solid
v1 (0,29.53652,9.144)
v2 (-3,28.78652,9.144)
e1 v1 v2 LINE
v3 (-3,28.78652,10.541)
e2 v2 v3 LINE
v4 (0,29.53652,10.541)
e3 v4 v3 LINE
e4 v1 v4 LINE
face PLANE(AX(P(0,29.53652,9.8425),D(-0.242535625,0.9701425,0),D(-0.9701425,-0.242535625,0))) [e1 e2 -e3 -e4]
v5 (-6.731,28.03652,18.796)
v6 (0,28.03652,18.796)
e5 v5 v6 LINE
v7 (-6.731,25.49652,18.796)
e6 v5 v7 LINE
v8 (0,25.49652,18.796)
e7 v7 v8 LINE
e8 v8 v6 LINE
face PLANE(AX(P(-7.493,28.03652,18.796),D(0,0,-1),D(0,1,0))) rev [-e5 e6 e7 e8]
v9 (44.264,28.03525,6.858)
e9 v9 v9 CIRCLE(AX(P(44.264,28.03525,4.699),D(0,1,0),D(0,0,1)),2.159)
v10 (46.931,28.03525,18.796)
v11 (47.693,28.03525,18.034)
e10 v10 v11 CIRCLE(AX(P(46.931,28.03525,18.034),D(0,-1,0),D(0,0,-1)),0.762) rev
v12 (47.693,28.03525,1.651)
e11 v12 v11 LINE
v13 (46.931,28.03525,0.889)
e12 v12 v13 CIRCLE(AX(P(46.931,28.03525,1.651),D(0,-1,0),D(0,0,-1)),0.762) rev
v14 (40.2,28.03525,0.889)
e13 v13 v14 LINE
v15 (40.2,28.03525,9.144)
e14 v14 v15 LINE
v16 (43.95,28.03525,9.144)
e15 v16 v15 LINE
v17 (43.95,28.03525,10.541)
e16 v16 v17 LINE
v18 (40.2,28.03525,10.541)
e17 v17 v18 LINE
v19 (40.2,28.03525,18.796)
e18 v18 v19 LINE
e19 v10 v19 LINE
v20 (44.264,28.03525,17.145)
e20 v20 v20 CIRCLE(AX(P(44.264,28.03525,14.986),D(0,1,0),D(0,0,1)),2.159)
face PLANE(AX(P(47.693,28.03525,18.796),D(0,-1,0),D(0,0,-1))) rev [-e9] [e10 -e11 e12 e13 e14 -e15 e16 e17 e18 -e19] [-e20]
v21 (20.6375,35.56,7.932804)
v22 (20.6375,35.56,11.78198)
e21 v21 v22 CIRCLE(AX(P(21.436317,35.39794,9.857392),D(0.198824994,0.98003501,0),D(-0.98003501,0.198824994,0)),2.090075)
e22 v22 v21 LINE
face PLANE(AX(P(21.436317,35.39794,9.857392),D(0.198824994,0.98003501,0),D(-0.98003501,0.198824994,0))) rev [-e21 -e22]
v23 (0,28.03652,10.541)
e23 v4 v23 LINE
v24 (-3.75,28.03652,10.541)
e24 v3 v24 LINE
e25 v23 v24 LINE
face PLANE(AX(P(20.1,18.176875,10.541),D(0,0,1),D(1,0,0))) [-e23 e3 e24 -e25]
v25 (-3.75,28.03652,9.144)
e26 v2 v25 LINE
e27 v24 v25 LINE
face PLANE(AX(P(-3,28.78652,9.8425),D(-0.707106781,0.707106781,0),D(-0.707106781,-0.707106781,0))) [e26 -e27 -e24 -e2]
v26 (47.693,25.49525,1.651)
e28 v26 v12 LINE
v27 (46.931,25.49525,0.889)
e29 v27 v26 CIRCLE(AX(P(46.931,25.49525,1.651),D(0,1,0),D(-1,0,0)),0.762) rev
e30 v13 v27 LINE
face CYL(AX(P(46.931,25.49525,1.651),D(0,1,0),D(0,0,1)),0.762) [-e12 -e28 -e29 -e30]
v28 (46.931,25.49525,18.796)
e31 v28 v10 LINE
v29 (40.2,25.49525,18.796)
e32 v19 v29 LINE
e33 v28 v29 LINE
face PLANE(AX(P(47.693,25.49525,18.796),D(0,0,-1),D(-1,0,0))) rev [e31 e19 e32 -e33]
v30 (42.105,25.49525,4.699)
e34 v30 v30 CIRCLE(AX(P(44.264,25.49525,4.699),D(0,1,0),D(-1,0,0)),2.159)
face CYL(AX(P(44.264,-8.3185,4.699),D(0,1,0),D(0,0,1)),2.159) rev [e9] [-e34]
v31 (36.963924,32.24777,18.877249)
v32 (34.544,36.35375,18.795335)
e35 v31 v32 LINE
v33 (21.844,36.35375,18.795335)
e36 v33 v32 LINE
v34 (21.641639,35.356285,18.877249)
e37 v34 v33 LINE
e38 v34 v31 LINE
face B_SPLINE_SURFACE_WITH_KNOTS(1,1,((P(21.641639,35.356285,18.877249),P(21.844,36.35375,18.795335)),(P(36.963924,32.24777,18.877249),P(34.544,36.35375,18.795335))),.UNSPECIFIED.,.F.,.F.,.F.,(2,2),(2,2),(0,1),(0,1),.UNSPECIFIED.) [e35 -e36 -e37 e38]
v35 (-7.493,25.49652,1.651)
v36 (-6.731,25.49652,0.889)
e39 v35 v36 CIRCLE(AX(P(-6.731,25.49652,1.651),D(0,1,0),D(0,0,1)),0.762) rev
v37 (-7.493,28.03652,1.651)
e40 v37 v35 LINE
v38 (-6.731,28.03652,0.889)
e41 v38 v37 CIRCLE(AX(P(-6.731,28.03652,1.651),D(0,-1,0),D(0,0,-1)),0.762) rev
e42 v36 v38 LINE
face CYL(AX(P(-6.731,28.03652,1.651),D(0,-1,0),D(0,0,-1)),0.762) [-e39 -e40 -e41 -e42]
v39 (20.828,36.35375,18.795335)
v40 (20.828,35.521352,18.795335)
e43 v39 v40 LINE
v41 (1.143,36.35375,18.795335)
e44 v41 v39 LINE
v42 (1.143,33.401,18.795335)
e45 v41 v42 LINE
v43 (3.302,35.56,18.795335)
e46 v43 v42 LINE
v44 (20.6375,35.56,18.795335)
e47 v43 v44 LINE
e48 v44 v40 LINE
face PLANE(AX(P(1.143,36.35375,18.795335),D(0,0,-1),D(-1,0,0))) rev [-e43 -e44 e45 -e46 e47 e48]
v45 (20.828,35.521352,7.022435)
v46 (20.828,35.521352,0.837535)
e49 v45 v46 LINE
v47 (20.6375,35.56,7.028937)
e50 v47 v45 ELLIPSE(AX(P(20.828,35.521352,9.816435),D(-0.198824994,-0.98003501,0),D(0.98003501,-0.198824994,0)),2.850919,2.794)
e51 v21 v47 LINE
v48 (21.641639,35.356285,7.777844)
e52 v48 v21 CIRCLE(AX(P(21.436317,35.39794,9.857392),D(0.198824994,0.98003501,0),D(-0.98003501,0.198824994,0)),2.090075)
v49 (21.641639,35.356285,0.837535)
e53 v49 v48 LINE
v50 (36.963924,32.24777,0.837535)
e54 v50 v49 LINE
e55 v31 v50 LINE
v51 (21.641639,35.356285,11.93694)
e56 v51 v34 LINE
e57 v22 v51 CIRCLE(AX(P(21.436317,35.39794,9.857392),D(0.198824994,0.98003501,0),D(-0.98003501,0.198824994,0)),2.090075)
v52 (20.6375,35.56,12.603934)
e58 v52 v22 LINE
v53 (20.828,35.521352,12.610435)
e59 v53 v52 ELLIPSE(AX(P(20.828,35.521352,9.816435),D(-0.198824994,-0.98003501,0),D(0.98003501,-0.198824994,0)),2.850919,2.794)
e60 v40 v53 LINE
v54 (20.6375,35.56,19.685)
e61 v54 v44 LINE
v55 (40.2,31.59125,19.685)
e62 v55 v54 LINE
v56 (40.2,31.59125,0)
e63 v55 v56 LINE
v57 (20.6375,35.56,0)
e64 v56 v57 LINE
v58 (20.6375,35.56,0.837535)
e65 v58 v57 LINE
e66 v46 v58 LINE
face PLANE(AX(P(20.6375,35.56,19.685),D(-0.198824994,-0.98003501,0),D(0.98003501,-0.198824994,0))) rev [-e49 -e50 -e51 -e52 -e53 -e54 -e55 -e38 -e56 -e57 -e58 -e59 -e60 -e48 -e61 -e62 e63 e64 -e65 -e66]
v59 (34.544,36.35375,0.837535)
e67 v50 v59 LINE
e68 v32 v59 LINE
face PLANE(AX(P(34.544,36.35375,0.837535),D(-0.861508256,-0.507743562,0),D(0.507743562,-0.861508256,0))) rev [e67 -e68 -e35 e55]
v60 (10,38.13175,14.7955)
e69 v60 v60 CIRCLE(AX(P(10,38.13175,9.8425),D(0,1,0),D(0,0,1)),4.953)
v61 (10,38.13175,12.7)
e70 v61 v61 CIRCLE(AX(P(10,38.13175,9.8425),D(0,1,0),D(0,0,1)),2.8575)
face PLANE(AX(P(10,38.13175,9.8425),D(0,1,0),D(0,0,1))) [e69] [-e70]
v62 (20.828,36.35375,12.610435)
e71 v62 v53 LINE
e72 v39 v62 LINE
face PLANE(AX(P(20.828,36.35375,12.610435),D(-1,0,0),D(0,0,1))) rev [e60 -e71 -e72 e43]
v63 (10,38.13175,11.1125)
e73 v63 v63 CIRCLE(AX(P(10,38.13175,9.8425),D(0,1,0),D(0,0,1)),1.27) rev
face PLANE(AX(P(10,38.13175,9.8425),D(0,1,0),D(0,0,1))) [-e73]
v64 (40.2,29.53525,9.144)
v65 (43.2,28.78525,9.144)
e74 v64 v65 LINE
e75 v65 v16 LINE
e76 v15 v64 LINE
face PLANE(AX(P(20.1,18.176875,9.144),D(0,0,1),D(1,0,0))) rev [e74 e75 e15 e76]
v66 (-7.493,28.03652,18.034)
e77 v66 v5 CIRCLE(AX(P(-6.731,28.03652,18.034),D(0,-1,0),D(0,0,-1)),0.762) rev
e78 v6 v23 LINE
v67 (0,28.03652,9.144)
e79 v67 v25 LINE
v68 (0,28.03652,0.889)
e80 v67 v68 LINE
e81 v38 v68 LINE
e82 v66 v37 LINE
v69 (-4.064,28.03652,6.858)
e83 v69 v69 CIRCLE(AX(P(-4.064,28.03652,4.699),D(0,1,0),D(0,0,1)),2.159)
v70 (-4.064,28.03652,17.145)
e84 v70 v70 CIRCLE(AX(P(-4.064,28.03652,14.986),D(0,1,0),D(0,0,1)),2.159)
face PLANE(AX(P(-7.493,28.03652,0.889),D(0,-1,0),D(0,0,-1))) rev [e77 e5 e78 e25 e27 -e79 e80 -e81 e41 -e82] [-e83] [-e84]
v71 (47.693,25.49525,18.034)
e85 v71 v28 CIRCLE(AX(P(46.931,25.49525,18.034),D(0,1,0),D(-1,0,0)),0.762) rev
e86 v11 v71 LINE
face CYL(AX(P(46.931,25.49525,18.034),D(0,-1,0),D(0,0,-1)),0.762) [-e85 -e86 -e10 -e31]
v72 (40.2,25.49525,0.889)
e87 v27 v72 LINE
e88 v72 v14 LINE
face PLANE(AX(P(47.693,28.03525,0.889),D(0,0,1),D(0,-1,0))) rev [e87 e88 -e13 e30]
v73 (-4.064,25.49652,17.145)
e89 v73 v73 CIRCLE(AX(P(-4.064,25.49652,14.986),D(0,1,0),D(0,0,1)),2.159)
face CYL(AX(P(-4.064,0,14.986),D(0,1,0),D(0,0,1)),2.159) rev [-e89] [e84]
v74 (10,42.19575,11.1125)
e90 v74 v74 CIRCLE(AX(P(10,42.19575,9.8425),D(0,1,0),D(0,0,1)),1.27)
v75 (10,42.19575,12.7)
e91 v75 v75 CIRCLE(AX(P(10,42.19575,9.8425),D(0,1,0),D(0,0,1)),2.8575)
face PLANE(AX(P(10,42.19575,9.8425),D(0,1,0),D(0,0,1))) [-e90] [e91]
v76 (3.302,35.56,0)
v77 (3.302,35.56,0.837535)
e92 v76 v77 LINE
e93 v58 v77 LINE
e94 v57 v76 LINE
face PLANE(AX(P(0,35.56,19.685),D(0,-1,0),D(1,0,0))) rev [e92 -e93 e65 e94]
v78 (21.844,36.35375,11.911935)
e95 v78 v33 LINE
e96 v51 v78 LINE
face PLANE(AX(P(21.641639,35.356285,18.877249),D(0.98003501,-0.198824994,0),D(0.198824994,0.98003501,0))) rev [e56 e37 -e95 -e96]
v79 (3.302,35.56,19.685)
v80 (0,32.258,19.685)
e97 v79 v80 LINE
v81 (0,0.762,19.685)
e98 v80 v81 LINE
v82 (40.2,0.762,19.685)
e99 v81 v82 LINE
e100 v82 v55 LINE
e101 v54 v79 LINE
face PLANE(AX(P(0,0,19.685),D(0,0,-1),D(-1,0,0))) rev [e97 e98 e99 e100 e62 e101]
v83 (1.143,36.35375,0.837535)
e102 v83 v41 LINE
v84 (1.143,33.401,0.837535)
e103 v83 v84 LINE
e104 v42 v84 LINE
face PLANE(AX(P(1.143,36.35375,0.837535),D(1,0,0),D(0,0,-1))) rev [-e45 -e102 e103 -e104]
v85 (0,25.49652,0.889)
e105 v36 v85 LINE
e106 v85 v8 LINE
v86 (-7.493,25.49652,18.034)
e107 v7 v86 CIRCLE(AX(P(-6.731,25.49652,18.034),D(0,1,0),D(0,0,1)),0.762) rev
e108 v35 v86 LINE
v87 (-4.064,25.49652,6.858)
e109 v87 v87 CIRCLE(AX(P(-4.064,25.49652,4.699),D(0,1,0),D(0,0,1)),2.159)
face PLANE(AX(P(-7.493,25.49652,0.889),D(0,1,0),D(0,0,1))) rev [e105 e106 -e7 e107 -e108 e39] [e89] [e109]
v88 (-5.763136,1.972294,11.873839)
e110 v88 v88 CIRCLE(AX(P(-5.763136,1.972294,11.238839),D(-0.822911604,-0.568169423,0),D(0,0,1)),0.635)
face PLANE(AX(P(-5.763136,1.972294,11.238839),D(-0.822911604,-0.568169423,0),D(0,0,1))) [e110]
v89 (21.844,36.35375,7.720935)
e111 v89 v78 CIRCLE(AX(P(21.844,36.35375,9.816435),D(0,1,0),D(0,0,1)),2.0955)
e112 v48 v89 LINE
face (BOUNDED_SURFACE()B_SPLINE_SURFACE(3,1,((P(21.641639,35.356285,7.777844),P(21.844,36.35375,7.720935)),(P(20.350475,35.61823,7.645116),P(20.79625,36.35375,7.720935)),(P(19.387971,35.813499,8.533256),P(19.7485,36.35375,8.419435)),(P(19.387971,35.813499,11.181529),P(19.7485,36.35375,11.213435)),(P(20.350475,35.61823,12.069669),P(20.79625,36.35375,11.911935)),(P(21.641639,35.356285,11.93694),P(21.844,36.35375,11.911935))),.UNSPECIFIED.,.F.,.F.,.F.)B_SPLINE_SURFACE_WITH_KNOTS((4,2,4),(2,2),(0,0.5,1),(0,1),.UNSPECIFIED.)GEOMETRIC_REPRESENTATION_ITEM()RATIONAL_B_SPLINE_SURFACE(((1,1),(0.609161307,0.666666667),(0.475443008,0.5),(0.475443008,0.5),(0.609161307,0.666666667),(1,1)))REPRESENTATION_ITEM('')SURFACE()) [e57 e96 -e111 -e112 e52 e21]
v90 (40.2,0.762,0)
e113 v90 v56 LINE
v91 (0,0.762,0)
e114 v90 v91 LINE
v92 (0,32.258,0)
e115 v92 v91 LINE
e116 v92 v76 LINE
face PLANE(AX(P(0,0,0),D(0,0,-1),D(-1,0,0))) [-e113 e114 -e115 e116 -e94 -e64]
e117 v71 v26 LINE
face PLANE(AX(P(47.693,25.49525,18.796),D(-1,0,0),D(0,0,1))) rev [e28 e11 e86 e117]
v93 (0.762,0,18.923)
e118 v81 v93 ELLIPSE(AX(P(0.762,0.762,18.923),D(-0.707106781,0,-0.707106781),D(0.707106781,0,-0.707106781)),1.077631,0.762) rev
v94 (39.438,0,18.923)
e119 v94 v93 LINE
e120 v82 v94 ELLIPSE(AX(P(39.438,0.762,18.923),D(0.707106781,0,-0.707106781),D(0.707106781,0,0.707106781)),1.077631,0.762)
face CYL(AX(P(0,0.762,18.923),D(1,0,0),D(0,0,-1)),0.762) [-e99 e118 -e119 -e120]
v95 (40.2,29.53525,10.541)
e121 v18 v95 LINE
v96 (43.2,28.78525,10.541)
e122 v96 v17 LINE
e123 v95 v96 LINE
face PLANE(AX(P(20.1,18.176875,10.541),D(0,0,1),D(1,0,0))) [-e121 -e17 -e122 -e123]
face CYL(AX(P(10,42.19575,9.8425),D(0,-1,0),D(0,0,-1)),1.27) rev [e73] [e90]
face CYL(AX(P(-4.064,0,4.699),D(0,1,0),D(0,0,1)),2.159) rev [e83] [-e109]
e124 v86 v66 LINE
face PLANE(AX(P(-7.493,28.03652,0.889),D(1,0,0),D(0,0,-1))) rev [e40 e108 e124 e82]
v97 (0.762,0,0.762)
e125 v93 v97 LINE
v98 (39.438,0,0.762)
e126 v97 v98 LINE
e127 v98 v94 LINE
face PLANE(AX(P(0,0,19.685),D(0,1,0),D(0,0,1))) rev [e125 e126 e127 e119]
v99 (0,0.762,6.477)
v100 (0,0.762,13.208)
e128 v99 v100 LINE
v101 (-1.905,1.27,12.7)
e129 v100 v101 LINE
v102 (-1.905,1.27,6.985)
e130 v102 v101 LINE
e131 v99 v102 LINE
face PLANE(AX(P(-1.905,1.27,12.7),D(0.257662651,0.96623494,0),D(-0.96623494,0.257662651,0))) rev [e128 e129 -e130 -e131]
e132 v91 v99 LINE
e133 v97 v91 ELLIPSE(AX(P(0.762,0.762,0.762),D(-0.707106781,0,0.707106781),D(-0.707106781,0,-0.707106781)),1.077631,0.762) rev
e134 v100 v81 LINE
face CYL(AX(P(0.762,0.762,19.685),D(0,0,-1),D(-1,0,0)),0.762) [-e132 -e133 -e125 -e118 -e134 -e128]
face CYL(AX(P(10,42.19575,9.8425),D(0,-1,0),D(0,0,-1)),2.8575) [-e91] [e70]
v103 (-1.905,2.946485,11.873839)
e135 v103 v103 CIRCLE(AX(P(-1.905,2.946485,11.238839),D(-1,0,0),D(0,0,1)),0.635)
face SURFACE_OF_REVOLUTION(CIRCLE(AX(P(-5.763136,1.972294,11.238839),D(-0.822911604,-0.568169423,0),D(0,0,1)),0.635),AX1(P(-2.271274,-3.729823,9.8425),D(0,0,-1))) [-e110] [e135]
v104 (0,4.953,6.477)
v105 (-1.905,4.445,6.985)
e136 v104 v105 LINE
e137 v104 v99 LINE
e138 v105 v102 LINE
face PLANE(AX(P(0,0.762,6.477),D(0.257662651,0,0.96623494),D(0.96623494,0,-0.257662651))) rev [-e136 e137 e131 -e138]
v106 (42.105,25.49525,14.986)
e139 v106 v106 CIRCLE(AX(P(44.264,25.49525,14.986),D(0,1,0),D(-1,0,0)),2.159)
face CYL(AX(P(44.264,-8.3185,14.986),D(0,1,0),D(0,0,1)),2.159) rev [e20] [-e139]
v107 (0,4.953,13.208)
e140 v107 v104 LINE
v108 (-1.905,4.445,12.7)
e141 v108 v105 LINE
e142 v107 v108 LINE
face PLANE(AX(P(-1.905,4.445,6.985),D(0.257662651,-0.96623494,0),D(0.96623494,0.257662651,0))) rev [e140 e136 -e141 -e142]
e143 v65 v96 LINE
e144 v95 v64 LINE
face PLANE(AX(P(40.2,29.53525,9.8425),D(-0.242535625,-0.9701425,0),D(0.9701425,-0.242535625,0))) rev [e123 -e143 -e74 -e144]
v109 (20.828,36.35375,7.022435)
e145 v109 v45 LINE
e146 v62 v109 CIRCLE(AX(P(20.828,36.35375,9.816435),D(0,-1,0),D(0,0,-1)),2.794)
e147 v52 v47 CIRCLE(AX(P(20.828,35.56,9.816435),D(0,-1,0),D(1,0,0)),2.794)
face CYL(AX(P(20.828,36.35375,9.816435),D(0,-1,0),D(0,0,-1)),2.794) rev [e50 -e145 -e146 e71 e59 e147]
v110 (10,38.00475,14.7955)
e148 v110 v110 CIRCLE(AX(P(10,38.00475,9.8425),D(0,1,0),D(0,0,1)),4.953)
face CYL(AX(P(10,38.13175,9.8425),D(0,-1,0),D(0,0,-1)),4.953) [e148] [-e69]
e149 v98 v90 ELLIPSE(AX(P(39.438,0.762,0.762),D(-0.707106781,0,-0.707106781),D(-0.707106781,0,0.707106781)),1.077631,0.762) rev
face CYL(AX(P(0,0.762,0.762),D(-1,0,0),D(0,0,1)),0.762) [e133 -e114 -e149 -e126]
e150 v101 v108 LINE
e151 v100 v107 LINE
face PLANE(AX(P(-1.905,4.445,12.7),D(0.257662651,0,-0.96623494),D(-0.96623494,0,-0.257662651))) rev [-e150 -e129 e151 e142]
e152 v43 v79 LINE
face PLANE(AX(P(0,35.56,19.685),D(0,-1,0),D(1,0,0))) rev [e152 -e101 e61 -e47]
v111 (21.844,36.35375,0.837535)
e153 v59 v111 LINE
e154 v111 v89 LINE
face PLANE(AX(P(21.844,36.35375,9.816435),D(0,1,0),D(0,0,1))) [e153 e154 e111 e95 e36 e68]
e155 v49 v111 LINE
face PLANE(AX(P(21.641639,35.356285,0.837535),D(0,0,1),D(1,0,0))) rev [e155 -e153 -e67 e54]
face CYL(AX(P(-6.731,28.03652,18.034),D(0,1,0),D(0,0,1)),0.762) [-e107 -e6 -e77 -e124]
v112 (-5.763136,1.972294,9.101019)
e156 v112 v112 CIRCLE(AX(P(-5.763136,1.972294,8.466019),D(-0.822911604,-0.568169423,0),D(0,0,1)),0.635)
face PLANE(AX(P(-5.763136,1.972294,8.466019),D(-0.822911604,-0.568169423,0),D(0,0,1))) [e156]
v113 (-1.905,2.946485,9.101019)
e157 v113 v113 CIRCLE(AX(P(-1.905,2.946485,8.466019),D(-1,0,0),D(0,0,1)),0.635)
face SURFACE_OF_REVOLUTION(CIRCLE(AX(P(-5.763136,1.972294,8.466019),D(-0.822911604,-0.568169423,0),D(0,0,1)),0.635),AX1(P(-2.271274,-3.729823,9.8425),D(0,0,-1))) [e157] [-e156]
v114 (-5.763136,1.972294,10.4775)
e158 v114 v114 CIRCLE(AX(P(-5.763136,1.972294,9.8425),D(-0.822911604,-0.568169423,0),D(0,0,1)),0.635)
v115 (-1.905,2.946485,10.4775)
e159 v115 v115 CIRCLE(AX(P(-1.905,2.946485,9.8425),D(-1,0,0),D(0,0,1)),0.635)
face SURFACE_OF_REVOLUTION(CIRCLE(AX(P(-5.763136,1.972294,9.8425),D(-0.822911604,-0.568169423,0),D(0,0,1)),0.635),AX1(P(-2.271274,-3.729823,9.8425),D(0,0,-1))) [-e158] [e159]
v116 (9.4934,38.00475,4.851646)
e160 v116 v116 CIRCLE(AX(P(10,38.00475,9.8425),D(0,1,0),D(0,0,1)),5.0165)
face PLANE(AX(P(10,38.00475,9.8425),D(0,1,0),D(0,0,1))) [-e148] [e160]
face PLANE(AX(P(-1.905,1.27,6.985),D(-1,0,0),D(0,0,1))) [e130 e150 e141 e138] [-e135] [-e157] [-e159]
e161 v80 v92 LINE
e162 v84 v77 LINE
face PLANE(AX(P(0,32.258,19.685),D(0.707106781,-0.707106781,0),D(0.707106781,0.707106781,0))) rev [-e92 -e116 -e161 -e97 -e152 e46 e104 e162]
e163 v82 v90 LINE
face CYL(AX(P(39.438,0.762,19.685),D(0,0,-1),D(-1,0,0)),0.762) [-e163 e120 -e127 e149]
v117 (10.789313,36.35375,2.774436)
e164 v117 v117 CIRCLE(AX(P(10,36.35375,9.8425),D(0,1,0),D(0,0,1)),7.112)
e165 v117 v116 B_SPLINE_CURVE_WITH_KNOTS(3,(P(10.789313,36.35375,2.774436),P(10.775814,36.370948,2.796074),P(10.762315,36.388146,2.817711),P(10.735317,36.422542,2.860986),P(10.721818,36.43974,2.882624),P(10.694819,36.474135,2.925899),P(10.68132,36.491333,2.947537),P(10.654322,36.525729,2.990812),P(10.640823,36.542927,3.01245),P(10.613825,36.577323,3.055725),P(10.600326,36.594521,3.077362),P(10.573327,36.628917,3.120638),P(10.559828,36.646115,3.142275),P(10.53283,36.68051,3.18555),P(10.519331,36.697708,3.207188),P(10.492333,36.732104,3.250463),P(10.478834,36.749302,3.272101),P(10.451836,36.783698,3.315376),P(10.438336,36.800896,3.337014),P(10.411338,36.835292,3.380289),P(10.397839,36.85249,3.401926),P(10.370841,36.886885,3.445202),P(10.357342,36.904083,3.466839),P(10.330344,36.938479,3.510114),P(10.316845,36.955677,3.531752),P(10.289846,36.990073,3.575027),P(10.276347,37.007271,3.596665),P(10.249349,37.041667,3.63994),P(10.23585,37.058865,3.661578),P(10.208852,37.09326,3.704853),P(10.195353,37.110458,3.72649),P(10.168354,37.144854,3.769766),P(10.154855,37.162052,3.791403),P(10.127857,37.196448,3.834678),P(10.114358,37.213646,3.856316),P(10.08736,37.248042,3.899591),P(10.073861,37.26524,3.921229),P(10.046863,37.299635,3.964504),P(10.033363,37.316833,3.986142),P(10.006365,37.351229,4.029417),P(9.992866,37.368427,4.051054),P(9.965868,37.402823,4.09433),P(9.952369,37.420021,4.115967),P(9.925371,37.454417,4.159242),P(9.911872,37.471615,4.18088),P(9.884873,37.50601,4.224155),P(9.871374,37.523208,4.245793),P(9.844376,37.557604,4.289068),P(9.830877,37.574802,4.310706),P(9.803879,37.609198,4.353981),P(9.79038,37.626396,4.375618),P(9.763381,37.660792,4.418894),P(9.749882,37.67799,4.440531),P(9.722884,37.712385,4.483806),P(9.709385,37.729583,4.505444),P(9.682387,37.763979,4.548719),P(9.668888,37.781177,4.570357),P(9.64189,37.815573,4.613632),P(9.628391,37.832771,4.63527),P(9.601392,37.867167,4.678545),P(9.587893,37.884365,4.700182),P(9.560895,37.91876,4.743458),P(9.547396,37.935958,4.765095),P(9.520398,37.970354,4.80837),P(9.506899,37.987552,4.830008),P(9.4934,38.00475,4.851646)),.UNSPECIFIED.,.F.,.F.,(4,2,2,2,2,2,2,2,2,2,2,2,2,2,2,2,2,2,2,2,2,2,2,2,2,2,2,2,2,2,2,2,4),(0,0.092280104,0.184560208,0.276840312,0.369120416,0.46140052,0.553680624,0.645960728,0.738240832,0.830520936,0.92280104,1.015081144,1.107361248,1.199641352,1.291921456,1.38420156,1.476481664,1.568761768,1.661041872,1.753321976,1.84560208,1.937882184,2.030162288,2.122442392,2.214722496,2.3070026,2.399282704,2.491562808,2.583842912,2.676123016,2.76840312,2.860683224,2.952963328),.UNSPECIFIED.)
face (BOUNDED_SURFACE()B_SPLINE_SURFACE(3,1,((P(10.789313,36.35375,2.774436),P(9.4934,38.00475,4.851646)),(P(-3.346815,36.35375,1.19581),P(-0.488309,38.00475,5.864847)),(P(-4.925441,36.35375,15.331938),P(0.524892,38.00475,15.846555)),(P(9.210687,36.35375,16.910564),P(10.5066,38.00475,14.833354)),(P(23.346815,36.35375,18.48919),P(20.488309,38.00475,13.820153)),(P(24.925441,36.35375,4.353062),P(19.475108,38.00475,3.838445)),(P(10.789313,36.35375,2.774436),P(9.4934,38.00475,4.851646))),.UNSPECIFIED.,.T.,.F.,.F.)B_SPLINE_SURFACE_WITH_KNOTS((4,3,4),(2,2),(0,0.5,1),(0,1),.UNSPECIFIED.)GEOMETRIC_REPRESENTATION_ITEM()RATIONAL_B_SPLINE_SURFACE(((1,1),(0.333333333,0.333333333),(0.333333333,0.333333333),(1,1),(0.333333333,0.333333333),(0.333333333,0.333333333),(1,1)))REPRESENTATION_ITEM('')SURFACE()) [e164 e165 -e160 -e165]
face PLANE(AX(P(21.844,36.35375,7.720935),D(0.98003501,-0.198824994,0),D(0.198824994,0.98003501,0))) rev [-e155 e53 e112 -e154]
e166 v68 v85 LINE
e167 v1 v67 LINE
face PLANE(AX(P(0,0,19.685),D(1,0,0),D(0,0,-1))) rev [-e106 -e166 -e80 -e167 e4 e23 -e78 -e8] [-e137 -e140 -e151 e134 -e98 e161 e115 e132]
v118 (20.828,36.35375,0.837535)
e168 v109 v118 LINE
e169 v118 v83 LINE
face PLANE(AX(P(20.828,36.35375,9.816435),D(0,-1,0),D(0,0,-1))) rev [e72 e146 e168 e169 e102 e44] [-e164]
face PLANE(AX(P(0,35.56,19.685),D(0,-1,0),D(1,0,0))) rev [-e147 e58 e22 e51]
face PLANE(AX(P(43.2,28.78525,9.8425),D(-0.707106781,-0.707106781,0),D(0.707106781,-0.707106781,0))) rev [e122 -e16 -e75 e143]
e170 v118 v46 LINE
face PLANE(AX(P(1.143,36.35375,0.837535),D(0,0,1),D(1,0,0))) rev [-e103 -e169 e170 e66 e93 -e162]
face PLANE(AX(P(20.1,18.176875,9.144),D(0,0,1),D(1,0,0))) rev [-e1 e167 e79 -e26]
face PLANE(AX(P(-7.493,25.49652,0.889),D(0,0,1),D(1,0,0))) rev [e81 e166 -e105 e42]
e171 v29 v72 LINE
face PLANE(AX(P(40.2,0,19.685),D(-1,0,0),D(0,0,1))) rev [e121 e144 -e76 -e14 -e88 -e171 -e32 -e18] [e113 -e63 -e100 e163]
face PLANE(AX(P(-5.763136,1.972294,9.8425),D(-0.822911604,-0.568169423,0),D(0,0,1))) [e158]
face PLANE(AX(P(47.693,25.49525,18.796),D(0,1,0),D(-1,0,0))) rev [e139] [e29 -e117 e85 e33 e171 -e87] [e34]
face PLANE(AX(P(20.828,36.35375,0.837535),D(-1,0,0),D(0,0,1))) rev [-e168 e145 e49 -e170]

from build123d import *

# Parameters (mm, degrees)
EXTRUDE1_DEPTH     = 19.685
CHAMFER1_SIZE      = 3.302
FILLET1_R          = 0.762
SKETCH2_W          = 17.907
SKETCH2_H          = 2.54
EXTRUDE2_DEPTH     = 7.493
SKETCH4_W          = 17.907
SKETCH4_H          = 2.54
EXTRUDE3_DEPTH     = 7.493
FILLET2_R          = 0.762
EXTRUDE4_DEPTH     = 36.35375
SKETCH10_R         = 2.159
CUT_EXTRUDE1_DEPTH = 36.35375
SKETCH19_R         = 2.159
CUT_EXTRUDE2_DEPTH = 59.72110295
RIB2_START         = -0.6985
RIB2_DEPTH         = 1.397
RIB3_START         = -0.6985
RIB3_DEPTH         = 1.397
SKETCH16_R         = 5.0165
EXTRUDE5_DEPTH     = 1.651
SKETCH18_R         = 4.953
EXTRUDE6_DEPTH     = 0.127
SKETCH20_R         = 2.8575
SKETCH20_R_2       = 1.27
EXTRUDE7_DEPTH     = 4.064
SKETCH22_W         = 5.715
SKETCH22_H         = 3.175
EXTRUDE8_DEPTH     = 1.905
SKETCH24_R         = 0.635


with BuildPart() as part:
    # Sketch1 → Extrude1 (new body)
    with BuildSketch(Plane.XY):
        Polygon((0, 0), (40.2, 0), (40.2, 31.59125), (20.6375, 35.56), (0, 35.56), align=None)
    extrude(amount=EXTRUDE1_DEPTH)

    # Chamfer1
    chamfer1_edges = [part.edges().sort_by_distance(p)[0] for p in [
        (0, 35.56, 9.8425),
    ]]
    chamfer(chamfer1_edges, length=CHAMFER1_SIZE)

    # Fillet1
    fillet1_edges = [part.edges().sort_by_distance(p)[0] for p in [
        (20.1, 0, 0),
        (20.1, 0, 19.685),
        (40.2, 0, 9.8425),
        (0, 0, 9.8425),
    ]]
    fillet(fillet1_edges, radius=FILLET1_R)

    # Sketch2 → Extrude2 (add)
    with BuildSketch(Plane(origin=(40.2, 0, 0), x_dir=(0, 0, -1), z_dir=(1, 0, 0))):
        with Locations((-9.8425, 26.76525)):
            Rectangle(SKETCH2_W, SKETCH2_H)
    extrude(amount=EXTRUDE2_DEPTH)

    # Sketch4 → Extrude3 (add)
    with BuildSketch(Plane.ZY):
        with Locations((9.8425, 26.76652)):
            Rectangle(SKETCH4_W, SKETCH4_H)
    extrude(amount=EXTRUDE3_DEPTH)

    # Fillet2
    fillet2_edges = [part.edges().sort_by_distance(p)[0] for p in [
        (47.693, 26.76525, 18.796),
        (47.693, 26.76525, 0.889),
        (-7.493, 26.76652, 0.889),
        (-7.493, 26.76652, 18.796),
    ]]
    fillet(fillet2_edges, radius=FILLET2_R)

    # Sketch5 → Extrude4 (add)
    with BuildSketch(Plane(origin=(0, 0, 0), x_dir=(1, 0, 0), z_dir=(0, 1, 0))):
        with BuildLine():
            Line((1.143, -0.837535442), (20.828, -0.837535442))
            Line((20.828, -0.837535442), (20.828, -7.022435442))
            ThreePointArc((20.828, -7.022435442), (18.034, -9.816435442), (20.828, -12.610435442))
            Line((20.828, -12.610435442), (20.828, -18.795335442))
            Line((20.828, -18.795335442), (1.143, -18.795335442))
            Line((1.143, -18.795335442), (1.143, -0.837535442))
        make_face()
    extrude(amount=EXTRUDE4_DEPTH)

    # Loft1: read off the stored shape, not the designer's step
    # Loft1: loft between two sections, ruled curve by curve
    loft1_from = [
        Edge.make_bspline([(21.641638875, 35.356284925, 7.777844123), (20.350474841, 35.618230344, 7.645115734), (19.387970871, 35.813498721, 8.533256016), (19.387970871, 35.813498721, 11.181528503), (20.350474841, 35.618230344, 12.069668784), (21.641638875, 35.356284925, 11.936940395)], [0, 0, 0, 0, 0.5, 0.5, 1, 1, 1, 1], 3, [1, 0.609161307, 0.475443008, 0.475443008, 0.609161307, 1]),
        Edge.make_bspline([(21.641638875, 35.356284925, 18.877249077), (36.963924395, 32.247770131, 18.877249077)], [0, 0, 1, 1], 1),
        Edge.make_line((21.641638875, 35.356284925, 0.837535442), (36.963924395, 32.247770131, 0.837535442)),
        Edge.make_line((36.963924395, 32.247770131, 0.837535442), (36.963924395, 32.247770131, 18.877249077)),
        Edge.make_line((21.641638875, 35.356284925, 7.777844123), (21.641638875, 35.356284925, 0.837535442)),
        Edge.make_line((21.641638875, 35.356284925, 18.877249077), (21.641638875, 35.356284925, 11.936940395)),
    ]
    loft1_to = [
        Edge.make_bspline([(21.844, 36.35375, 7.720935442), (20.79625, 36.35375, 7.720935442), (19.7485, 36.35375, 8.419435442), (19.7485, 36.35375, 11.213435442), (20.79625, 36.35375, 11.911935442), (21.844, 36.35375, 11.911935442)], [0, 0, 0, 0, 0.5, 0.5, 1, 1, 1, 1], 3, [1, 0.666666667, 0.5, 0.5, 0.666666667, 1]),
        Edge.make_bspline([(21.844, 36.35375, 18.795335442), (34.544, 36.35375, 18.795335442)], [0, 0, 1, 1], 1),
        Edge.make_line((21.844, 36.35375, 0.837535442), (34.544, 36.35375, 0.837535442)),
        Edge.make_line((34.544, 36.35375, 0.837535442), (34.544, 36.35375, 18.795335442)),
        Edge.make_line((21.844, 36.35375, 7.720935442), (21.844, 36.35375, 0.837535442)),
        Edge.make_line((21.844, 36.35375, 18.795335442), (21.844, 36.35375, 11.911935442)),
    ]
    loft1 = Solid(Shell([*[Face.make_surface_from_curves(loft1_from[k], loft1_to[k]) for k in range(6)], Face(Wire(loft1_from)), Face(Wire(loft1_to))]))
    add(loft1)

    # Sketch10 → Cut-Extrude1 (cut)
    with BuildSketch(Plane(origin=(0, 28.03525, 0), x_dir=(-1, 0, 0), z_dir=(0, 1, 0))):
        with Locations(Location((-44.264, 4.699, 0), (0, 0, 90))):
            Circle(SKETCH10_R)
        with Locations(Location((-44.264, 14.986, 0), (0, 0, 90))):
            Circle(SKETCH10_R)
    extrude(amount=-CUT_EXTRUDE1_DEPTH, mode=Mode.SUBTRACT)

    # Sketch19 → Cut-Extrude2 (cut, through all)
    with BuildSketch(Plane(origin=(0, 28.03652, 0), x_dir=(-1, 0, 0), z_dir=(0, 1, 0))):
        with Locations(Location((4.064, 4.699, 0), (0, 0, 90))):
            Circle(SKETCH19_R)
        with Locations(Location((4.064, 14.986, 0), (0, 0, 90))):
            Circle(SKETCH19_R)
    extrude(amount=-CUT_EXTRUDE2_DEPTH, mode=Mode.SUBTRACT)

    # Rib2: read off the stored shape, not the designer's step
    # Rib2 outline → Rib2 (add)
    with BuildSketch(Plane.XY.offset(9.8425).offset(RIB2_START)):
        Polygon((43.95, 28.03525), (43.2, 28.78525), (40.2, 29.53525), (40.2, 28.03525), align=None)
    extrude(amount=RIB2_DEPTH)

    # Rib3: read off the stored shape, not the designer's step
    # Rib3 outline → Rib3 (add)
    with BuildSketch(Plane.XY.offset(9.8425).offset(RIB3_START)):
        Polygon((0, 29.53652), (-3, 28.78652), (-3.75, 28.03652), (0, 28.03652), align=None)
    extrude(amount=RIB3_DEPTH)

    # Sketch16 → Extrude5 (add)
    with BuildSketch(Plane(origin=(0, 36.35375, 0), x_dir=(-1, 0, 0), z_dir=(0, 1, 0))):
        with Locations(Location((-10, 9.8425, 0), (0, 0, 270))):
            Circle(SKETCH16_R)
    extrude(amount=EXTRUDE5_DEPTH)

    # Loft2: read off the stored shape, not the designer's step
    # Loft2: loft between two sections, ruled curve by curve
    loft2_from = [
        Edge.make_bspline([(10.789313033, 36.35375, 2.774435984), (-3.346815, 36.35375, 1.195809919), (-4.925441065, 36.35375, 15.331937951), (9.210686967, 36.35375, 16.910564016), (23.346815, 36.35375, 18.489190081), (24.925441065, 36.35375, 4.353062049), (10.789313033, 36.35375, 2.774435984)], [0, 0, 0, 0, 0.5, 0.5, 0.5, 1, 1, 1, 1], 3, [1, 0.333333333, 0.333333333, 1, 0.333333333, 0.333333333, 1]),
    ]
    loft2_to = [
        Edge.make_bspline([(9.493399511, 38.00475, 4.851645545), (-0.488309399, 38.00475, 5.864846522), (0.524891578, 38.00475, 15.846555433), (10.506600489, 38.00475, 14.833354455), (20.488309399, 38.00475, 13.820153478), (19.475108422, 38.00475, 3.838444567), (9.493399511, 38.00475, 4.851645545)], [0, 0, 0, 0, 0.5, 0.5, 0.5, 1, 1, 1, 1], 3, [1, 0.333333333, 0.333333333, 1, 0.333333333, 0.333333333, 1]),
    ]
    loft2 = Solid(Shell([*[Face.make_surface_from_curves(loft2_from[k], loft2_to[k]) for k in range(1)], Face(Wire(loft2_from)), Face(Wire(loft2_to))]))
    add(loft2)

    # Sketch18 → Extrude6 (add)
    with BuildSketch(Plane(origin=(0, 38.00475, 0), x_dir=(-1, 0, 0), z_dir=(0, 1, 0))):
        with Locations(Location((-10, 9.8425, 0), (0, 0, 90))):
            Circle(SKETCH18_R)
    extrude(amount=EXTRUDE6_DEPTH)

    # Sketch20 → Extrude7 (add)
    with BuildSketch(Plane(origin=(0, 38.13175, 0), x_dir=(-1, 0, 0), z_dir=(0, 1, 0))):
        with Locations(Location((-10, 9.8425, 0), (0, 0, 90))):
            Circle(SKETCH20_R)
        with Locations(Location((-10, 9.8425, 0), (0, 0, 90))):
            Circle(SKETCH20_R_2, mode=Mode.SUBTRACT)
    extrude(amount=EXTRUDE7_DEPTH)

    # Sketch22 → Extrude8 (add)
    with BuildSketch(Plane.ZY):
        with Locations((9.8425, 2.8575)):
            Rectangle(SKETCH22_W, SKETCH22_H)
    extrude(amount=EXTRUDE8_DEPTH)

    # Sketch21 → section 0 of loft3
    with BuildSketch(Plane.ZY, mode=Mode.PRIVATE) as loft3_s0:
        with BuildLine():
            Line((6.477, 4.953), (13.208, 4.953))
            Line((13.208, 4.953), (13.208, 0.762))
            Line((13.208, 0.762), (6.477, 0.762))
            Line((6.477, 0.762), (6.477, 4.953))
        make_face()
    # loft up to a face of the part (loft3)
    loft([loft3_s0.sketch, part.faces().sort_by_distance((-1.905, 2.8575, 9.8425))[0]])

    # Sweep3: sweep along a path in Sketch23
    with BuildLine(Plane.XY.offset(9.8425)) as sweep3_path:
        ThreePointArc((-1.905, 2.946484605), (-3.908218654, 2.753050744), (-5.763136487, 1.972293764))
    # Sketch24 → Sweep3 (sweep)
    with BuildSketch(Plane.ZY.offset(1.905)):
        with Locations((9.8425, 2.946484605)):
            Circle(SKETCH24_R)
        with Locations((11.23883905, 2.946484605)):
            Circle(SKETCH24_R)
        with Locations((8.466018651, 2.946484605)):
            Circle(SKETCH24_R)
    sweep(path=sweep3_path.line)


solid = part.part
